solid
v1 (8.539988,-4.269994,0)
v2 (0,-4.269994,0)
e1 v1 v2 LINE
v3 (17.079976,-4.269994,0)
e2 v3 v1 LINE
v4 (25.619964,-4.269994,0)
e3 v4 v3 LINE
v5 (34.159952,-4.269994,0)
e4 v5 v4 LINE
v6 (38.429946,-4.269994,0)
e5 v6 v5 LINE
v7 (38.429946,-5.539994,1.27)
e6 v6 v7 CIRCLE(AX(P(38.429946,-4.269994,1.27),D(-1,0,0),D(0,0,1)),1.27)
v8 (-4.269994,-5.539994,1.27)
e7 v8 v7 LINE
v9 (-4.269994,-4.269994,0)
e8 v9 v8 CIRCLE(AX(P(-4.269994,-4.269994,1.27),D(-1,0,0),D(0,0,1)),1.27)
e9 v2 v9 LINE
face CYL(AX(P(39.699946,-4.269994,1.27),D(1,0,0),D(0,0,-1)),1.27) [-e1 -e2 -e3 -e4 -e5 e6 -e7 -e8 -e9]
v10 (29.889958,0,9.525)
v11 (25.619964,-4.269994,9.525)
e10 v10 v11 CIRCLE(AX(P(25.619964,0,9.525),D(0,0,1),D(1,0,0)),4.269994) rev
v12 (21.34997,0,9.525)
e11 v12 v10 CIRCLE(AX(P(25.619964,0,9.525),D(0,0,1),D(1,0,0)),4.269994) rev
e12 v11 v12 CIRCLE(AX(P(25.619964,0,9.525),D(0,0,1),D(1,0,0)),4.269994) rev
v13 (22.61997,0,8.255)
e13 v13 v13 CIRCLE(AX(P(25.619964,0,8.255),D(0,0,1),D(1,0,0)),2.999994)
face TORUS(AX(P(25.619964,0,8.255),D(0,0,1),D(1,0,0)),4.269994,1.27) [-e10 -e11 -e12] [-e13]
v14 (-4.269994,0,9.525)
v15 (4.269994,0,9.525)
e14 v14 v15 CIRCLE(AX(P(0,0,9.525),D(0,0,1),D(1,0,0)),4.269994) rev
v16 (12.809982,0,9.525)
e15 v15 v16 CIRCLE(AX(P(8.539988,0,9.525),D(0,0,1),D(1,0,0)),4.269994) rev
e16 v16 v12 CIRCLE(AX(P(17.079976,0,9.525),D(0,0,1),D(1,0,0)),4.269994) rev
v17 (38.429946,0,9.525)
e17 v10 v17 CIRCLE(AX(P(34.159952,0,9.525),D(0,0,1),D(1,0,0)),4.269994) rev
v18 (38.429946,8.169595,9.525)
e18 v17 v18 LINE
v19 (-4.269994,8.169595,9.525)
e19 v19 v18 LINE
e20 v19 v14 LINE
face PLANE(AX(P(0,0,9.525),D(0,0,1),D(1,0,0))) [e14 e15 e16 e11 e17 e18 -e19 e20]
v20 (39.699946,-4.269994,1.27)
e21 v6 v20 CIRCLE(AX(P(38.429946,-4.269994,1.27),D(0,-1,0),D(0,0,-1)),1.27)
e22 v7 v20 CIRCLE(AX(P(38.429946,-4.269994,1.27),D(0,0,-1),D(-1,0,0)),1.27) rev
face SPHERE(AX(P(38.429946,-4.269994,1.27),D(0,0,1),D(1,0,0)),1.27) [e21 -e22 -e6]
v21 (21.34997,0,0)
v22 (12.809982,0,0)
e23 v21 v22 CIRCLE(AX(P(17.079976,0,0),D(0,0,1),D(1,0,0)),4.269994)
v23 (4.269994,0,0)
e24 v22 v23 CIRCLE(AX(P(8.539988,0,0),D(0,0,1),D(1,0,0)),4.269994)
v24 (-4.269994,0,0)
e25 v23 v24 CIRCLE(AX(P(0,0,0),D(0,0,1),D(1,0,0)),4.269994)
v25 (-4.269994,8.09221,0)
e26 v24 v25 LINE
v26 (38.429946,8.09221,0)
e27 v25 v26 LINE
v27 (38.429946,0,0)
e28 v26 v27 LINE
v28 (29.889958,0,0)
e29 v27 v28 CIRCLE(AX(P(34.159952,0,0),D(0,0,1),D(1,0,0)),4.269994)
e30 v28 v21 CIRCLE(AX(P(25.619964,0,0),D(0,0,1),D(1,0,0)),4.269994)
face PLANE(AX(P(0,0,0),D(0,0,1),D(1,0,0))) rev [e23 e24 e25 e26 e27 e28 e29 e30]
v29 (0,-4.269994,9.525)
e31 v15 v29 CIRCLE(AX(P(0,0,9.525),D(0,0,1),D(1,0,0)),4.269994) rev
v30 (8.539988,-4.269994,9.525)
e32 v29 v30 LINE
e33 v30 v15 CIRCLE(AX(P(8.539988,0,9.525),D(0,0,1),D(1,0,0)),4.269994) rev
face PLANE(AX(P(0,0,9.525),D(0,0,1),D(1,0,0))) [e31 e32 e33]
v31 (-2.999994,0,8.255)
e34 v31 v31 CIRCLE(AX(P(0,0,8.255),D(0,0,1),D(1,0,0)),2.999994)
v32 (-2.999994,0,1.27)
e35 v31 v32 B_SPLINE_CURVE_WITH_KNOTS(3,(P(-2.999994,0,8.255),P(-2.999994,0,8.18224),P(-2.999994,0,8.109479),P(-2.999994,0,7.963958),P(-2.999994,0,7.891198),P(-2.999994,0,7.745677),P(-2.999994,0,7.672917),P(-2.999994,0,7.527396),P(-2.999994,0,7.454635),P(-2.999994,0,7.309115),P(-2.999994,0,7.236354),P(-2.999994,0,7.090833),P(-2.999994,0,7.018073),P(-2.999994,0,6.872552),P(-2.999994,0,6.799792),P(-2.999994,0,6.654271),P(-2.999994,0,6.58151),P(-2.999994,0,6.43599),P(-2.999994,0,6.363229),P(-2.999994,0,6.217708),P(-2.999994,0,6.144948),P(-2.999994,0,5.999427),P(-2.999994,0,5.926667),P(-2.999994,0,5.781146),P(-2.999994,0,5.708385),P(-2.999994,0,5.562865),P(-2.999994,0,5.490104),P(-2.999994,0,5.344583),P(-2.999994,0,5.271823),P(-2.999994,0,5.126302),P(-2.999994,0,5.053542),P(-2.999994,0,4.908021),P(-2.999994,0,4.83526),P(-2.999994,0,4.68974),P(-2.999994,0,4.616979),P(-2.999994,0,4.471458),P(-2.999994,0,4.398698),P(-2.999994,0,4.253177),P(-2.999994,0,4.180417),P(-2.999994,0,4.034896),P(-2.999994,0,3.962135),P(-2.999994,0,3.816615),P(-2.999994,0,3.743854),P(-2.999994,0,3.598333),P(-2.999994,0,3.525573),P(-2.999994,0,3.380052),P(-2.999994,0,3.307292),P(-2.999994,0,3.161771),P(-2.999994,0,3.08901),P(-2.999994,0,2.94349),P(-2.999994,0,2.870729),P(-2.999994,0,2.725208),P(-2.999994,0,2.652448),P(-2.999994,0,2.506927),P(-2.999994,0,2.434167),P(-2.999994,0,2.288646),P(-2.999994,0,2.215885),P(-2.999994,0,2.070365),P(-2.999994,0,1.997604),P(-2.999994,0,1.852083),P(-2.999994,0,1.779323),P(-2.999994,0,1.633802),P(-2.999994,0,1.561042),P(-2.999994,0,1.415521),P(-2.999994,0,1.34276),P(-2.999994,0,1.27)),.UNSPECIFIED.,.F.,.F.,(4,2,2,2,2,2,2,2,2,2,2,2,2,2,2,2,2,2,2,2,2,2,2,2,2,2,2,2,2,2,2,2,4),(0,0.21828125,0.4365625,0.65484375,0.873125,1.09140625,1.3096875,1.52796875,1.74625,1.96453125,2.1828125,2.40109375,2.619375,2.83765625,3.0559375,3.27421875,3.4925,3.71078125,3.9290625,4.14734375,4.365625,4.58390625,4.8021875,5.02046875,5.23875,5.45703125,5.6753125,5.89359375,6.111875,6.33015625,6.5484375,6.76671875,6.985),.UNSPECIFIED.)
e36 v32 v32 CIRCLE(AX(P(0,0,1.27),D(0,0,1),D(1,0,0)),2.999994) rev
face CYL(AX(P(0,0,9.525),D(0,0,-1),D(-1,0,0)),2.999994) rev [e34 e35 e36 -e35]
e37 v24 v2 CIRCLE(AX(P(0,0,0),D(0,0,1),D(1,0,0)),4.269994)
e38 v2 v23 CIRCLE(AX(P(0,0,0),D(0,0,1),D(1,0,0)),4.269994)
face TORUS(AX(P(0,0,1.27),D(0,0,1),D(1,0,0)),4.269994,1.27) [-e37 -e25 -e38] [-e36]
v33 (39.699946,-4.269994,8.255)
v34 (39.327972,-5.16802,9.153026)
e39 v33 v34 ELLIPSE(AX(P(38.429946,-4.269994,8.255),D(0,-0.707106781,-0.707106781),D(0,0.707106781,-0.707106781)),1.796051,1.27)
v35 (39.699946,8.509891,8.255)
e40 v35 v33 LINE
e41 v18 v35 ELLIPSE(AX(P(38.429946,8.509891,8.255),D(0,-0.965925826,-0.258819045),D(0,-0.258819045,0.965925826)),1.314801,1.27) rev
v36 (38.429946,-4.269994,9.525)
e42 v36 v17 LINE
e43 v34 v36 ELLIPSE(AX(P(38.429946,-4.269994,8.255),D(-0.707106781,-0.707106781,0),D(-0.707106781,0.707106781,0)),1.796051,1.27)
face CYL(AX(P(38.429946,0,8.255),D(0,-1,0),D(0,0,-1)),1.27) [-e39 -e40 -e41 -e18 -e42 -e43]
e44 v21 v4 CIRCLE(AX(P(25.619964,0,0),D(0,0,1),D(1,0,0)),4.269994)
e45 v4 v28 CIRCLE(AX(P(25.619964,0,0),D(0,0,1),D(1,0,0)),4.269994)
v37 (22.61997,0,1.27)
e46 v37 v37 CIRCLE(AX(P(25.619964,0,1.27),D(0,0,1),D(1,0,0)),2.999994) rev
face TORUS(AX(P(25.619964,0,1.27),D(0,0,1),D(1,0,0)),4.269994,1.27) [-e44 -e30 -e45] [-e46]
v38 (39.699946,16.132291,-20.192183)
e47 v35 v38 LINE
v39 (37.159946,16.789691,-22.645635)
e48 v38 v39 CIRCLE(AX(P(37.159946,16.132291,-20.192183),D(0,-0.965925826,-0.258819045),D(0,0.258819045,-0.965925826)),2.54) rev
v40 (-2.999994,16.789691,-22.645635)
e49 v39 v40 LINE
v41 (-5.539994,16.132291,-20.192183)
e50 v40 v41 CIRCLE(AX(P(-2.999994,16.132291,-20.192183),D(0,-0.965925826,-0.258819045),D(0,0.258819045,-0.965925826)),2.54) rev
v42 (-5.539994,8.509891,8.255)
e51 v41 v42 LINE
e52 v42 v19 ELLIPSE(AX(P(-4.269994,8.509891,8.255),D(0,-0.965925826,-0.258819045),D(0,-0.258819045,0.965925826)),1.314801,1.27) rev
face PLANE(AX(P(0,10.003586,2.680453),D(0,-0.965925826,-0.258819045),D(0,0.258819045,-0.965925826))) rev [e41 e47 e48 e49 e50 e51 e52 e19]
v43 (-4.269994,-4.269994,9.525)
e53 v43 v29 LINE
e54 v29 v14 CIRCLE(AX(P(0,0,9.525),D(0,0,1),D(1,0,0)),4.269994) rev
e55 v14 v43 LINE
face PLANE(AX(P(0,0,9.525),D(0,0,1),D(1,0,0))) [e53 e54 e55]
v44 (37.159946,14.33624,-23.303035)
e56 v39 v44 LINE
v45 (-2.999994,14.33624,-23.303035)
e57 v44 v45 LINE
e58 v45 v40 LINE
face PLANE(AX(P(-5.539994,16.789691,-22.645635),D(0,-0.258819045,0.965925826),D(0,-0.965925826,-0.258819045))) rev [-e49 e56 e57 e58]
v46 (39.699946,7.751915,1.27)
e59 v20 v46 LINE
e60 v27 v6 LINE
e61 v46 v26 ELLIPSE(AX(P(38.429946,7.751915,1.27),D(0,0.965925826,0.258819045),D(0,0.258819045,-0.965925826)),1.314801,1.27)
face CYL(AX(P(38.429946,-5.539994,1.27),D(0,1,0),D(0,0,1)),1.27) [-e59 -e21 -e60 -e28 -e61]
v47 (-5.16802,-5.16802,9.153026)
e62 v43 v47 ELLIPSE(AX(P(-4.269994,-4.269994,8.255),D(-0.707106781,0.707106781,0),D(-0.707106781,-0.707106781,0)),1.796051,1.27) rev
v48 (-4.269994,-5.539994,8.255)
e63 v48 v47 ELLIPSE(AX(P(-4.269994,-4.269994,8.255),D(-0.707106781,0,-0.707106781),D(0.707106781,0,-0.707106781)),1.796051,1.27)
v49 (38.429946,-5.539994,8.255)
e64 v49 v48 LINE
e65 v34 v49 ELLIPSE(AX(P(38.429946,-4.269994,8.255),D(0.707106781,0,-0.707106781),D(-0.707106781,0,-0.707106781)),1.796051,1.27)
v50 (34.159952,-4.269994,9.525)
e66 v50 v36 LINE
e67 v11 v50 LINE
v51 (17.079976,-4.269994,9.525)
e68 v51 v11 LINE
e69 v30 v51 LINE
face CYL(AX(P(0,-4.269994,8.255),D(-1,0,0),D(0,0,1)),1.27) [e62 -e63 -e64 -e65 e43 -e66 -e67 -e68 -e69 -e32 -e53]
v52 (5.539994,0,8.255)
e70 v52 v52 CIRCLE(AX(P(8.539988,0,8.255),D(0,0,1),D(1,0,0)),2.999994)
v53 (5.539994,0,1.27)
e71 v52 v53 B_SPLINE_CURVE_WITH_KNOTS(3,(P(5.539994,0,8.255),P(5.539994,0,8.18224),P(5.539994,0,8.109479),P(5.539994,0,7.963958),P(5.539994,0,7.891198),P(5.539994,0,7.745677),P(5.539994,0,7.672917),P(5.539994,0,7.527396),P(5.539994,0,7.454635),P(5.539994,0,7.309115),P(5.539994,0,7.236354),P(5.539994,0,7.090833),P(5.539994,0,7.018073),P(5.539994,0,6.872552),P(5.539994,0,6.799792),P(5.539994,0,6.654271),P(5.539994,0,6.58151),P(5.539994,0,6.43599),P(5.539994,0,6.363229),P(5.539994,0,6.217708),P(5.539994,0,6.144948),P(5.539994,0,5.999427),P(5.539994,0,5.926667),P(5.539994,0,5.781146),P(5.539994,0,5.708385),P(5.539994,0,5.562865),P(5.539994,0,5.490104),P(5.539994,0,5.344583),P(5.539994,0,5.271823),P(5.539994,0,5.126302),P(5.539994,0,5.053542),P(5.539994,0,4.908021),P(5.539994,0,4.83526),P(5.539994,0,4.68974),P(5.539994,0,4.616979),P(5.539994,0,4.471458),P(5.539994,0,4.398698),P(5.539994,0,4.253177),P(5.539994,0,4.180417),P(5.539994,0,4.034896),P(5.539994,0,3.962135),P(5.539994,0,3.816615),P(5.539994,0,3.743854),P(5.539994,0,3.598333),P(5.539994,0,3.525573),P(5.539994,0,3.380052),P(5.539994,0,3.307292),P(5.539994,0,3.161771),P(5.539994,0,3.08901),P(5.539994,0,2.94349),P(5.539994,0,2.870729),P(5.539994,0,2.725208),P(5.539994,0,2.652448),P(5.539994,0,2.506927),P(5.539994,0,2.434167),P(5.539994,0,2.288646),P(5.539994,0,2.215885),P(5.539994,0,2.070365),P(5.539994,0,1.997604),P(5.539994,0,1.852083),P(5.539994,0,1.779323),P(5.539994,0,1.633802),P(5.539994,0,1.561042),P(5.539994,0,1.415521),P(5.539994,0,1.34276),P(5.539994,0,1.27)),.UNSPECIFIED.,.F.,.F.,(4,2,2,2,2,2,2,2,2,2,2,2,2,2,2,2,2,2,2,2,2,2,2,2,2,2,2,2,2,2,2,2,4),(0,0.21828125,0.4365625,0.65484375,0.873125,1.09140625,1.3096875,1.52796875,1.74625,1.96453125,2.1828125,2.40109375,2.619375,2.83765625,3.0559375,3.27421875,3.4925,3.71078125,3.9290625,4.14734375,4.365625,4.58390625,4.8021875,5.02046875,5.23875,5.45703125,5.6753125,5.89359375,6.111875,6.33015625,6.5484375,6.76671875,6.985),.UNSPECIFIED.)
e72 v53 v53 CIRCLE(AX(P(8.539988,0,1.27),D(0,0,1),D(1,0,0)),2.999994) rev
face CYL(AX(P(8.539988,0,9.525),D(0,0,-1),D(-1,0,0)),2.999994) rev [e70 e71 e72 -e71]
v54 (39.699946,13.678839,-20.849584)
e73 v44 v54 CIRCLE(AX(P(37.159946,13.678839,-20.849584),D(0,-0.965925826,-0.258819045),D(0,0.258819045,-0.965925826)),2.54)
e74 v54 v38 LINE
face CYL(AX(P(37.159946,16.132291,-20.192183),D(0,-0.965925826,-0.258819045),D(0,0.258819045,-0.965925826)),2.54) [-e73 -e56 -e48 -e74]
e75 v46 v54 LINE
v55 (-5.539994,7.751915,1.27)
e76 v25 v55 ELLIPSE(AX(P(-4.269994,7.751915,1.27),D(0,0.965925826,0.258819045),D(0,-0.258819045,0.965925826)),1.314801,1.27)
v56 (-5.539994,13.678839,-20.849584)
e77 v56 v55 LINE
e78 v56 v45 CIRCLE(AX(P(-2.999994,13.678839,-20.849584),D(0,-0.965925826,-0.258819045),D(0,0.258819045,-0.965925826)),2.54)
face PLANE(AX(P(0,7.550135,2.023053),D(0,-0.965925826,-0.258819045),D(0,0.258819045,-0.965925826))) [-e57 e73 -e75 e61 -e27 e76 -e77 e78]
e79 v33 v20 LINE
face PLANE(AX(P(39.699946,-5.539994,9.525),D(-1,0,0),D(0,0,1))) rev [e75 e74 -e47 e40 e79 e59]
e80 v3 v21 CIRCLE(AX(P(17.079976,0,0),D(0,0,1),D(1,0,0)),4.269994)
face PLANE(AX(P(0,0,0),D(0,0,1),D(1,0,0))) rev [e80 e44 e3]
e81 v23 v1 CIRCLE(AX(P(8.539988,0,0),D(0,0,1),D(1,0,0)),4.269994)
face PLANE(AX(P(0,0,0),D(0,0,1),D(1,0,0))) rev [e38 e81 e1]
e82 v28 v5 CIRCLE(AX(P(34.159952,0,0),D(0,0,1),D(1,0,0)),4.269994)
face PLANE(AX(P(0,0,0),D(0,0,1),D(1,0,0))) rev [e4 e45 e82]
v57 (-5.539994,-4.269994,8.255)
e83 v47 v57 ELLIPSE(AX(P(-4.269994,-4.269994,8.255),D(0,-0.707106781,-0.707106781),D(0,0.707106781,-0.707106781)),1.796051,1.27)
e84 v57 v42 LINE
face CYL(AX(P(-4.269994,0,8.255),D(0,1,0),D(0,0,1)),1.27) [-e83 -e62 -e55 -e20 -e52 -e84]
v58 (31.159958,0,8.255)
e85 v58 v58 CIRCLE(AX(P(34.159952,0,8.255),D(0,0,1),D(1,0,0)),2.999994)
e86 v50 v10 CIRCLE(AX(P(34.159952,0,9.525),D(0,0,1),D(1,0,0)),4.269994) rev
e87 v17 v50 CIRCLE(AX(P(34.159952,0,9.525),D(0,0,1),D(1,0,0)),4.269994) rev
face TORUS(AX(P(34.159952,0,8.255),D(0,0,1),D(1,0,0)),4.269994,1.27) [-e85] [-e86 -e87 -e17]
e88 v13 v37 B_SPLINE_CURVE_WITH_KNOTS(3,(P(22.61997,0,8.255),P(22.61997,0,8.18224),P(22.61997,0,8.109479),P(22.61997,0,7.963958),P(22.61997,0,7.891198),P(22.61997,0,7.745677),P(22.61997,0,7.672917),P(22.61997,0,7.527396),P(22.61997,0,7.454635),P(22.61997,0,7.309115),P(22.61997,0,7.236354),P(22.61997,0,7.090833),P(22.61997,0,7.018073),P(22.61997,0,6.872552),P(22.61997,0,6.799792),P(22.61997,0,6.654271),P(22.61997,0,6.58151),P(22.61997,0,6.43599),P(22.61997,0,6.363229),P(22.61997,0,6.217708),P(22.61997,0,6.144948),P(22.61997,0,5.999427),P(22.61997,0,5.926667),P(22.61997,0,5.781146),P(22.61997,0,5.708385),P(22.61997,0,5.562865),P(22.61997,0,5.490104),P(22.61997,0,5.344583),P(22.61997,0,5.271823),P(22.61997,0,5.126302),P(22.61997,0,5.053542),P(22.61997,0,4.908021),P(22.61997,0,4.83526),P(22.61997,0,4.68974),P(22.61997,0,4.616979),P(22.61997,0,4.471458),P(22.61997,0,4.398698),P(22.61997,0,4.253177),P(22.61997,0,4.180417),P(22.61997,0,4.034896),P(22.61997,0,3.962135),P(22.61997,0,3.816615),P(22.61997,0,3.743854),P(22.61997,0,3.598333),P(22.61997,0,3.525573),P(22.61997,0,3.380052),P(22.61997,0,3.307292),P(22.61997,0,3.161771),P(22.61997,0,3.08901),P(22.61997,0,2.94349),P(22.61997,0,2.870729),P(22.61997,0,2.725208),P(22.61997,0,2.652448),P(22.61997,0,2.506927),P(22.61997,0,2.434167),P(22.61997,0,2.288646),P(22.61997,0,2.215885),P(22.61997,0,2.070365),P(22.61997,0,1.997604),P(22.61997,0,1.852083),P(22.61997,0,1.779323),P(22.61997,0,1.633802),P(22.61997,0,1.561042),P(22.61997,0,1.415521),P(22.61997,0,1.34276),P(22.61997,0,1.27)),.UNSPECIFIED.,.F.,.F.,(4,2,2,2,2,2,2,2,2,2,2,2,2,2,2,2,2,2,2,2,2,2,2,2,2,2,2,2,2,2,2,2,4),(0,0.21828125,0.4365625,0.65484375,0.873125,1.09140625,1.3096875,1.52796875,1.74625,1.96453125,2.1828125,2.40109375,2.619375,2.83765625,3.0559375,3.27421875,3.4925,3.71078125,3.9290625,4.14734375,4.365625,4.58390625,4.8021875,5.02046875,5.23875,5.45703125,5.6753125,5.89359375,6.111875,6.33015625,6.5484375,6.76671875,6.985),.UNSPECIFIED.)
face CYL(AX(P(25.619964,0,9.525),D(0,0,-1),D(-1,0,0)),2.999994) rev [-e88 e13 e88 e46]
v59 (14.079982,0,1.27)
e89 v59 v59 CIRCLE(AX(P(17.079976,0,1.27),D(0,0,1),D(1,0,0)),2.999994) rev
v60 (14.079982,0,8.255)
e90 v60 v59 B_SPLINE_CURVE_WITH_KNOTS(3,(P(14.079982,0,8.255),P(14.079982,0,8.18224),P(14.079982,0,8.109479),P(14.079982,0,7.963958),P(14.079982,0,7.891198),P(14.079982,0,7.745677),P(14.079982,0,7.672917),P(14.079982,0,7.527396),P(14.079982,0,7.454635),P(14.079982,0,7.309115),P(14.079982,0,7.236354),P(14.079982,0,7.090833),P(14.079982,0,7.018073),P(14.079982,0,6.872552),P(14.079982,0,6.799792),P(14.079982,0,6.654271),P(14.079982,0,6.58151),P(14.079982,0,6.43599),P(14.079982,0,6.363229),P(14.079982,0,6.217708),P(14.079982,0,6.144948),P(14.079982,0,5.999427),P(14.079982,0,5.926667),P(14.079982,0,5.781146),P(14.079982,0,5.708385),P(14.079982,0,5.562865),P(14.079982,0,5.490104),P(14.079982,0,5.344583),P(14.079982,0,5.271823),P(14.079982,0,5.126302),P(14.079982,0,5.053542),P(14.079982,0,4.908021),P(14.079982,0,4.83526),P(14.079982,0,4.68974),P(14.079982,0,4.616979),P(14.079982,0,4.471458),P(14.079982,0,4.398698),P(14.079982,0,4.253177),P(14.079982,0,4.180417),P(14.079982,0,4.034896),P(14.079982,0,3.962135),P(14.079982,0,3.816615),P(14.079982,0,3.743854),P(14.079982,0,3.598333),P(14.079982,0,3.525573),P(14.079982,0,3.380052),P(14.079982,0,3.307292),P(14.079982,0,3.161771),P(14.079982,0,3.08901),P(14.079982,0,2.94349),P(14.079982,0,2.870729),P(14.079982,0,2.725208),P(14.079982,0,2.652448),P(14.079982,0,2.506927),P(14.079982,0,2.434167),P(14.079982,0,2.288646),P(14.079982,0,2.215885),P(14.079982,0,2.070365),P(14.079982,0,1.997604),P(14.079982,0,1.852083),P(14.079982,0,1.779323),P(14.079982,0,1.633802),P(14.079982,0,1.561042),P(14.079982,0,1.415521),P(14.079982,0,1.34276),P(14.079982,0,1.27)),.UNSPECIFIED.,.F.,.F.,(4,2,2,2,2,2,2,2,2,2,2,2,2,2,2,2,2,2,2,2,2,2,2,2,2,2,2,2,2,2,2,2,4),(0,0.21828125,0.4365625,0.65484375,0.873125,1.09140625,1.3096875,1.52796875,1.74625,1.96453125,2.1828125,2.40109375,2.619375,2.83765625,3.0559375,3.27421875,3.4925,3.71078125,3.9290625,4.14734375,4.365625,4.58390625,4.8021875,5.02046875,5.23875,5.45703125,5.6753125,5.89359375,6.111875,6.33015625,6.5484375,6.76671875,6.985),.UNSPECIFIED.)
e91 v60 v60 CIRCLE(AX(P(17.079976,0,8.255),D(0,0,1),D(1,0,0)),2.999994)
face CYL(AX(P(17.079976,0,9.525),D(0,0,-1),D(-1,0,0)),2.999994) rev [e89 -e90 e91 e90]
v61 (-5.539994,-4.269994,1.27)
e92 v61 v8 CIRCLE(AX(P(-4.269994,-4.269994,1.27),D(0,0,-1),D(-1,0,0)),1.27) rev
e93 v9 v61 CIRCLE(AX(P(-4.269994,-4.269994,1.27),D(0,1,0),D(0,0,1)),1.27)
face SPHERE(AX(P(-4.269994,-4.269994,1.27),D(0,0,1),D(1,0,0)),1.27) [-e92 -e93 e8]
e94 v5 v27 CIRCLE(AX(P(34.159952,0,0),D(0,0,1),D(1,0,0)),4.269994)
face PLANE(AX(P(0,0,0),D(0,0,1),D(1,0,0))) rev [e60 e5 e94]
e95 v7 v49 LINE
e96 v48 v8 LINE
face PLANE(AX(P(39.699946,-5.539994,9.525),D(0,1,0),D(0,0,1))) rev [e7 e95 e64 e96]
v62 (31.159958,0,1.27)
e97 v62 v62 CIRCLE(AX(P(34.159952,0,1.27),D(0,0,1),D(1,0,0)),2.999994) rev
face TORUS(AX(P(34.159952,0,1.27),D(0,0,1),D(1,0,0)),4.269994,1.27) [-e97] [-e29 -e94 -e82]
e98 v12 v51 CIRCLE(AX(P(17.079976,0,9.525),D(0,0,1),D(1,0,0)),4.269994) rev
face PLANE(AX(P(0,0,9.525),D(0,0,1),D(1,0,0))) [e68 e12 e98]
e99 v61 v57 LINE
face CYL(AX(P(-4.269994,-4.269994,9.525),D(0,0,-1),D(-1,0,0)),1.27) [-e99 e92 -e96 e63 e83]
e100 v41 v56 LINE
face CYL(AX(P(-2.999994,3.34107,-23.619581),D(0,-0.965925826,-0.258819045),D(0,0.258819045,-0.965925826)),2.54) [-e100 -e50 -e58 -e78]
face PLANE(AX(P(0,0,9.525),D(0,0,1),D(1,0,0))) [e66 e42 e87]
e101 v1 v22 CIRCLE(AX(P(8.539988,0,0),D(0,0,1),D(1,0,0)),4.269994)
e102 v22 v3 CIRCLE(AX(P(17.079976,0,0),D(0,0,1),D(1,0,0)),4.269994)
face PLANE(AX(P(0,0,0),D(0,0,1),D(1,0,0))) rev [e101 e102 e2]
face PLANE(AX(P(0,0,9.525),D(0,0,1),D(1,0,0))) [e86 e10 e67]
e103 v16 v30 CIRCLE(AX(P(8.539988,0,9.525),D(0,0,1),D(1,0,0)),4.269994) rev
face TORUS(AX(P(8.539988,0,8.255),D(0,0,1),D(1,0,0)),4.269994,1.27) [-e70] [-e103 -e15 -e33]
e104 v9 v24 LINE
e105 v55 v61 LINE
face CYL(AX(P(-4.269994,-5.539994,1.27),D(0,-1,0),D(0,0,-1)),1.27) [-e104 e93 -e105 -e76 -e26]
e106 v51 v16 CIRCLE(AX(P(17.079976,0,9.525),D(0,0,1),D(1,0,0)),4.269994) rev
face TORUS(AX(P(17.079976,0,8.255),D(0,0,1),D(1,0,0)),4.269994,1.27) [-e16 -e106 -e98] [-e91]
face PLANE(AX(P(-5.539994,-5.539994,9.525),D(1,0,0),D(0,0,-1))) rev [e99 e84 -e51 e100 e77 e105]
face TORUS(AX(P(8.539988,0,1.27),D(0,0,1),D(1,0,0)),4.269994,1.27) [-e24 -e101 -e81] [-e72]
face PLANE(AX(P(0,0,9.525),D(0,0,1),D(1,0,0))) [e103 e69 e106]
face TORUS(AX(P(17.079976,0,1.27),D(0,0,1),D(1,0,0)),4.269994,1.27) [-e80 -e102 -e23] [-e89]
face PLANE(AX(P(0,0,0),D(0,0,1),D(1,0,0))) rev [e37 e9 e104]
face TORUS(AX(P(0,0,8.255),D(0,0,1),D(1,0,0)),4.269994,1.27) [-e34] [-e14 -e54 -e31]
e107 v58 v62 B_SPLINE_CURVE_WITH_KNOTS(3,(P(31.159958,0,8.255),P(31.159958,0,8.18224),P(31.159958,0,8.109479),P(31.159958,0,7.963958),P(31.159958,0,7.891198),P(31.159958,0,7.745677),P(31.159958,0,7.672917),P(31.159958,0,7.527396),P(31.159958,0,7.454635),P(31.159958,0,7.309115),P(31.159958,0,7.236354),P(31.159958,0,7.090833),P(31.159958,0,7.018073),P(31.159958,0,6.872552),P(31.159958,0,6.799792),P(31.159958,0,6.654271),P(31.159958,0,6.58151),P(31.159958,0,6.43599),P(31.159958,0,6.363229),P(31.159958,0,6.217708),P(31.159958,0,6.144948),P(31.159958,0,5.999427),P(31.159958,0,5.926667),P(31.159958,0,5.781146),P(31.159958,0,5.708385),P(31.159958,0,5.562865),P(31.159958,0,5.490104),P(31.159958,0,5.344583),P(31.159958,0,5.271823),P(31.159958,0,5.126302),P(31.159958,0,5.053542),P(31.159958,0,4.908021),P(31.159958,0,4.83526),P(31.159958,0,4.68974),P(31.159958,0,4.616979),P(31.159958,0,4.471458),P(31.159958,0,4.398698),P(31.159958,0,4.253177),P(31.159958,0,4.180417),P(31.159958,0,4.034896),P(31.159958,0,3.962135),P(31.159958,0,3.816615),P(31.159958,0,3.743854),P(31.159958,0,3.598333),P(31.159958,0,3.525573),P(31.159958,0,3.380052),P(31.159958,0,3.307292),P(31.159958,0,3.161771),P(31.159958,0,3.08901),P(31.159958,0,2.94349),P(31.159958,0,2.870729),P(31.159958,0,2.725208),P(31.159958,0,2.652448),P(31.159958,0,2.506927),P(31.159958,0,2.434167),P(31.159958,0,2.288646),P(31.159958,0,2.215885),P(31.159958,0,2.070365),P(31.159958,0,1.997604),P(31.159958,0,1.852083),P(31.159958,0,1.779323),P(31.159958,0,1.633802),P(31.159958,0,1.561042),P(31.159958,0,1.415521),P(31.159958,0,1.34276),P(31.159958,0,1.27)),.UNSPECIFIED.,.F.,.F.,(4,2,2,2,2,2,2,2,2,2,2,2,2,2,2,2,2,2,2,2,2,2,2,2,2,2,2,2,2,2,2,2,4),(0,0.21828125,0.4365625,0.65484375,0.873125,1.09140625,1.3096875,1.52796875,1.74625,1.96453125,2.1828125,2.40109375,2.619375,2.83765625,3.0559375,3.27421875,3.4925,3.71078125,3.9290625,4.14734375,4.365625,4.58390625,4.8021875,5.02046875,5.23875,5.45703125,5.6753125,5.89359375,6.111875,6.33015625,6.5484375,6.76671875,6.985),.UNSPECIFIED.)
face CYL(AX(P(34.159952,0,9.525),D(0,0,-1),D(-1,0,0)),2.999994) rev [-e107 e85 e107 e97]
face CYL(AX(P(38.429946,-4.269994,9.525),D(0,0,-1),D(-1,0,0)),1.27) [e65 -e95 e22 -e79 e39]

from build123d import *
from build123d.topology import SkipClean

# Parameters (mm, degrees)
SKETCH1_W               = 45.23994
SKETCH1_H               = 11.079988
SKETCH1_R               = 2.999994
BOSS_EXTRUDE1_DEPTH     = 9.525
BOSS_EXTRUDE2_DEPTH     = 45.23994
FILLET1_R               = 1.27
FILLET2_R               = 1.27
FILLET3_R               = 1.27
FILLET4_R               = 1.27
BOSS_EXTRUDE3_DEPTH     = 2.54
CUT_EXTRUDE1_DEPTH      = 52.163776393
CUT_EXTRUDE1_DEPTH_BACK = 52.163776393
FILLET5_R               = 2.54


# Some blends are built 0.0001 mm under size
with BuildPart() as part:
    # Sketch1 → Boss-Extrude1 (new body)
    with BuildSketch(Plane.XY):
        with Locations((17.079976, 0)):
            Rectangle(SKETCH1_W, SKETCH1_H)
        with Locations(Location((0, 0, 0), (0, 0, 180))):
            Circle(SKETCH1_R, mode=Mode.SUBTRACT)
        with Locations(Location((8.539988, 0, 0), (0, 0, 180))):
            Circle(SKETCH1_R, mode=Mode.SUBTRACT)
        with Locations(Location((17.079976, 0, 0), (0, 0, 180))):
            Circle(SKETCH1_R, mode=Mode.SUBTRACT)
        with Locations(Location((25.619964, 0, 0), (0, 0, 180))):
            Circle(SKETCH1_R, mode=Mode.SUBTRACT)
        with Locations(Location((34.159952, 0, 0), (0, 0, 180))):
            Circle(SKETCH1_R, mode=Mode.SUBTRACT)
    extrude(amount=BOSS_EXTRUDE1_DEPTH)

    # Sketch2 → Boss-Extrude2 (add)
    with BuildSketch(Plane(origin=(39.699946, 0, 0), x_dir=(0, 0, -1), z_dir=(1, 0, 0))):
        Polygon((-9.525, 5.539994), (0, 8.092210058), (0, 5.539994), align=None)
    extrude(amount=-BOSS_EXTRUDE2_DEPTH)

    # Fillet1
    fillet1_edges = [part.edges().sort_by_distance(p)[0] for p in [
        (39.699946, -5.539994, 4.7625),
        (-5.539994, -5.539994, 4.7625),
    ]]
    fillet(fillet1_edges, radius=FILLET1_R)

    # Fillet2
    # the kernel refuses this fillet: 1.27 mm, written as the material it takes off along each edge
    with BuildSketch(Plane(origin=(38.429946, -5.539994, 0), x_dir=(0, 0, 1), z_dir=(-1, 0, 0))) as fillet2_piece_1:
        with BuildLine():
            CenterArc((FILLET2_R, FILLET2_R), FILLET2_R, 180, 90)
            Line((0, FILLET2_R), (0, 0))
            Line((0, 0), (FILLET2_R, 0))
        make_face()
    extrude(amount=42.69994, mode=Mode.SUBTRACT)
    with BuildSketch(Plane(origin=(41.604946, -5.539994, 9.525), x_dir=(0, 0, -1), z_dir=(-1, 0, 0))) as fillet2_piece_2:
        with BuildLine():
            CenterArc((FILLET2_R, -FILLET2_R), FILLET2_R, 90, 90)
            Line((0, -FILLET2_R), (0, 0))
            Line((0, 0), (FILLET2_R, 0))
        make_face()
    extrude(amount=49.04994, mode=Mode.SUBTRACT)
    with BuildSketch(Plane(origin=(39.699946, -4.269994, 0), x_dir=(-1, 0, 0), z_dir=(0, 1, 0)), Plane(origin=(-5.539994, 11.267210058, 0), x_dir=(1, 0, 0), z_dir=(0, -1, 0))) as fillet2_piece_3:
        with BuildLine():
            CenterArc((FILLET2_R, FILLET2_R), FILLET2_R, 180, 90)
            Line((0, FILLET2_R), (0, 0))
            Line((0, 0), (FILLET2_R, 0))
        make_face()
    extrude(amount=15.537204058, mode=Mode.SUBTRACT)
    with BuildSketch(Plane(origin=(38.429946, -4.269994, 0), x_dir=(0, -1, 0), z_dir=(-1, 0, 0))) as fillet2_piece_4:
        with BuildLine():
            CenterArc((1.27 - FILLET2_R, FILLET2_R), FILLET2_R, 270, 90)
            Line((1.27, FILLET2_R), (1.27, 0))
            Line((1.27, 0), (1.27 - FILLET2_R, 0))
        make_face()
    revolve(axis=Axis((38.429946, -4.269994, 0), (0, 0, 1)), revolution_arc=90, mode=Mode.SUBTRACT)
    with BuildSketch(Plane(origin=(-4.269994, -4.269994, 0), x_dir=(0, -1, 0), z_dir=(1, 0, 0))) as fillet2_piece_5:
        with BuildLine():
            CenterArc((1.27 - FILLET2_R, -FILLET2_R), FILLET2_R, 0, 90)
            Line((1.27, -FILLET2_R), (1.27, 0))
            Line((1.27, 0), (1.27 - FILLET2_R, 0))
        make_face()
    revolve(axis=Axis((-4.269994, -4.269994, 0), (0, 0, -1)), revolution_arc=90, mode=Mode.SUBTRACT)

    # Fillet3
    # the kernel refuses this fillet: 1.27 mm, written as the material it takes off along each edge
    with BuildSketch(Plane(origin=(39.699946, 8.714994, 9.525), x_dir=(-1, 0, 0), z_dir=(0, -1, 0))) as fillet3_piece_1:
        with BuildLine():
            CenterArc((FILLET3_R, FILLET3_R), FILLET3_R, 180, 90)
            Line((0, FILLET3_R), (0, 0))
            Line((0, 0), (FILLET3_R, 0))
        make_face()
    extrude(amount=16.159988, mode=Mode.SUBTRACT)
    with BuildSketch(Plane(origin=(-5.539994, -7.444994, 9.525), x_dir=(0, 0, -1), z_dir=(0, 1, 0))) as fillet3_piece_2:
        with BuildLine():
            CenterArc((FILLET3_R, -FILLET3_R), FILLET3_R, 90, 90)
            Line((0, -FILLET3_R), (0, 0))
            Line((0, 0), (FILLET3_R, 0))
        make_face()
    extrude(amount=16.159988, mode=Mode.SUBTRACT)

    # Fillet4
    fillet4_edges = [part.edges().sort_by_distance(p)[0] for p in [
        (2.999994, 0, 0),
        (2.999994, 0, 9.525),
        (11.539982, 0, 0),
        (11.539982, 0, 9.525),
        (20.07997, 0, 0),
        (20.07997, 0, 9.525),
        (28.619958, 0, 0),
        (28.619958, 0, 9.525),
        (37.159946, 0, 0),
        (37.159946, 0, 9.525),
    ]]
    fillet(fillet4_edges, radius=FILLET4_R - 0.0001)  # a hair under: the kernel refuses the full size

    # Sketch3 → Boss-Extrude3 (add)
    with BuildSketch(Plane(origin=(0, 7.55013477, 2.023052514), x_dir=(1, 0, 0), z_dir=(0, 0.96592582628907, 0.2588190451025148))):
        Polygon((-5.539994, 0.779617331), (-5.539994, 26.219495625), (39.699946, 26.219495625), (39.699946, 0.779617331), (39.699946, -7.766587538), (-5.539994, -7.766587538), align=None)
    extrude(amount=BOSS_EXTRUDE3_DEPTH)

    # Sketch4 → Cut-Extrude1 (cut, two sides: drawn at the far end of the back side and taken through both)
    with SkipClean():  # the faces are left unmerged after this step: merging them gives an invalid solid
        with BuildSketch(Plane.XZ.offset(5.539994).offset(-CUT_EXTRUDE1_DEPTH_BACK)):
            with BuildLine():
                Line((-4.269994, 9.525), (38.429946, 9.525))
                ThreePointArc((38.429946, 9.525), (38.915953959, 9.428327006), (39.327971612, 9.153025612))
                ThreePointArc((39.327971612, 9.153025612), (39.603273006, 8.741007959), (39.699946, 8.255))
                Line((39.699946, 8.255), (39.699946, 24.042761525))
                Line((39.699946, 24.042761525), (-5.539994, 24.042761525))
                Line((-5.539994, 24.042761525), (-5.539994, 8.255))
                ThreePointArc((-5.539994, 8.255), (-5.443321006, 8.741007959), (-5.168019612, 9.153025612))
                ThreePointArc((-5.168019612, 9.153025612), (-4.756001959, 9.428327006), (-4.269994, 9.525))
            make_face()
        extrude(amount=CUT_EXTRUDE1_DEPTH + CUT_EXTRUDE1_DEPTH_BACK, mode=Mode.SUBTRACT)

    # Fillet5
    fillet5_edges = [part.edges().sort_by_distance(p)[0] for p in [
        (39.699946, 15.562965391, -22.974335275),
        (-5.539994, 15.562965391, -22.974335275),
    ]]
    fillet(fillet5_edges, radius=FILLET5_R)


solid = part.part
